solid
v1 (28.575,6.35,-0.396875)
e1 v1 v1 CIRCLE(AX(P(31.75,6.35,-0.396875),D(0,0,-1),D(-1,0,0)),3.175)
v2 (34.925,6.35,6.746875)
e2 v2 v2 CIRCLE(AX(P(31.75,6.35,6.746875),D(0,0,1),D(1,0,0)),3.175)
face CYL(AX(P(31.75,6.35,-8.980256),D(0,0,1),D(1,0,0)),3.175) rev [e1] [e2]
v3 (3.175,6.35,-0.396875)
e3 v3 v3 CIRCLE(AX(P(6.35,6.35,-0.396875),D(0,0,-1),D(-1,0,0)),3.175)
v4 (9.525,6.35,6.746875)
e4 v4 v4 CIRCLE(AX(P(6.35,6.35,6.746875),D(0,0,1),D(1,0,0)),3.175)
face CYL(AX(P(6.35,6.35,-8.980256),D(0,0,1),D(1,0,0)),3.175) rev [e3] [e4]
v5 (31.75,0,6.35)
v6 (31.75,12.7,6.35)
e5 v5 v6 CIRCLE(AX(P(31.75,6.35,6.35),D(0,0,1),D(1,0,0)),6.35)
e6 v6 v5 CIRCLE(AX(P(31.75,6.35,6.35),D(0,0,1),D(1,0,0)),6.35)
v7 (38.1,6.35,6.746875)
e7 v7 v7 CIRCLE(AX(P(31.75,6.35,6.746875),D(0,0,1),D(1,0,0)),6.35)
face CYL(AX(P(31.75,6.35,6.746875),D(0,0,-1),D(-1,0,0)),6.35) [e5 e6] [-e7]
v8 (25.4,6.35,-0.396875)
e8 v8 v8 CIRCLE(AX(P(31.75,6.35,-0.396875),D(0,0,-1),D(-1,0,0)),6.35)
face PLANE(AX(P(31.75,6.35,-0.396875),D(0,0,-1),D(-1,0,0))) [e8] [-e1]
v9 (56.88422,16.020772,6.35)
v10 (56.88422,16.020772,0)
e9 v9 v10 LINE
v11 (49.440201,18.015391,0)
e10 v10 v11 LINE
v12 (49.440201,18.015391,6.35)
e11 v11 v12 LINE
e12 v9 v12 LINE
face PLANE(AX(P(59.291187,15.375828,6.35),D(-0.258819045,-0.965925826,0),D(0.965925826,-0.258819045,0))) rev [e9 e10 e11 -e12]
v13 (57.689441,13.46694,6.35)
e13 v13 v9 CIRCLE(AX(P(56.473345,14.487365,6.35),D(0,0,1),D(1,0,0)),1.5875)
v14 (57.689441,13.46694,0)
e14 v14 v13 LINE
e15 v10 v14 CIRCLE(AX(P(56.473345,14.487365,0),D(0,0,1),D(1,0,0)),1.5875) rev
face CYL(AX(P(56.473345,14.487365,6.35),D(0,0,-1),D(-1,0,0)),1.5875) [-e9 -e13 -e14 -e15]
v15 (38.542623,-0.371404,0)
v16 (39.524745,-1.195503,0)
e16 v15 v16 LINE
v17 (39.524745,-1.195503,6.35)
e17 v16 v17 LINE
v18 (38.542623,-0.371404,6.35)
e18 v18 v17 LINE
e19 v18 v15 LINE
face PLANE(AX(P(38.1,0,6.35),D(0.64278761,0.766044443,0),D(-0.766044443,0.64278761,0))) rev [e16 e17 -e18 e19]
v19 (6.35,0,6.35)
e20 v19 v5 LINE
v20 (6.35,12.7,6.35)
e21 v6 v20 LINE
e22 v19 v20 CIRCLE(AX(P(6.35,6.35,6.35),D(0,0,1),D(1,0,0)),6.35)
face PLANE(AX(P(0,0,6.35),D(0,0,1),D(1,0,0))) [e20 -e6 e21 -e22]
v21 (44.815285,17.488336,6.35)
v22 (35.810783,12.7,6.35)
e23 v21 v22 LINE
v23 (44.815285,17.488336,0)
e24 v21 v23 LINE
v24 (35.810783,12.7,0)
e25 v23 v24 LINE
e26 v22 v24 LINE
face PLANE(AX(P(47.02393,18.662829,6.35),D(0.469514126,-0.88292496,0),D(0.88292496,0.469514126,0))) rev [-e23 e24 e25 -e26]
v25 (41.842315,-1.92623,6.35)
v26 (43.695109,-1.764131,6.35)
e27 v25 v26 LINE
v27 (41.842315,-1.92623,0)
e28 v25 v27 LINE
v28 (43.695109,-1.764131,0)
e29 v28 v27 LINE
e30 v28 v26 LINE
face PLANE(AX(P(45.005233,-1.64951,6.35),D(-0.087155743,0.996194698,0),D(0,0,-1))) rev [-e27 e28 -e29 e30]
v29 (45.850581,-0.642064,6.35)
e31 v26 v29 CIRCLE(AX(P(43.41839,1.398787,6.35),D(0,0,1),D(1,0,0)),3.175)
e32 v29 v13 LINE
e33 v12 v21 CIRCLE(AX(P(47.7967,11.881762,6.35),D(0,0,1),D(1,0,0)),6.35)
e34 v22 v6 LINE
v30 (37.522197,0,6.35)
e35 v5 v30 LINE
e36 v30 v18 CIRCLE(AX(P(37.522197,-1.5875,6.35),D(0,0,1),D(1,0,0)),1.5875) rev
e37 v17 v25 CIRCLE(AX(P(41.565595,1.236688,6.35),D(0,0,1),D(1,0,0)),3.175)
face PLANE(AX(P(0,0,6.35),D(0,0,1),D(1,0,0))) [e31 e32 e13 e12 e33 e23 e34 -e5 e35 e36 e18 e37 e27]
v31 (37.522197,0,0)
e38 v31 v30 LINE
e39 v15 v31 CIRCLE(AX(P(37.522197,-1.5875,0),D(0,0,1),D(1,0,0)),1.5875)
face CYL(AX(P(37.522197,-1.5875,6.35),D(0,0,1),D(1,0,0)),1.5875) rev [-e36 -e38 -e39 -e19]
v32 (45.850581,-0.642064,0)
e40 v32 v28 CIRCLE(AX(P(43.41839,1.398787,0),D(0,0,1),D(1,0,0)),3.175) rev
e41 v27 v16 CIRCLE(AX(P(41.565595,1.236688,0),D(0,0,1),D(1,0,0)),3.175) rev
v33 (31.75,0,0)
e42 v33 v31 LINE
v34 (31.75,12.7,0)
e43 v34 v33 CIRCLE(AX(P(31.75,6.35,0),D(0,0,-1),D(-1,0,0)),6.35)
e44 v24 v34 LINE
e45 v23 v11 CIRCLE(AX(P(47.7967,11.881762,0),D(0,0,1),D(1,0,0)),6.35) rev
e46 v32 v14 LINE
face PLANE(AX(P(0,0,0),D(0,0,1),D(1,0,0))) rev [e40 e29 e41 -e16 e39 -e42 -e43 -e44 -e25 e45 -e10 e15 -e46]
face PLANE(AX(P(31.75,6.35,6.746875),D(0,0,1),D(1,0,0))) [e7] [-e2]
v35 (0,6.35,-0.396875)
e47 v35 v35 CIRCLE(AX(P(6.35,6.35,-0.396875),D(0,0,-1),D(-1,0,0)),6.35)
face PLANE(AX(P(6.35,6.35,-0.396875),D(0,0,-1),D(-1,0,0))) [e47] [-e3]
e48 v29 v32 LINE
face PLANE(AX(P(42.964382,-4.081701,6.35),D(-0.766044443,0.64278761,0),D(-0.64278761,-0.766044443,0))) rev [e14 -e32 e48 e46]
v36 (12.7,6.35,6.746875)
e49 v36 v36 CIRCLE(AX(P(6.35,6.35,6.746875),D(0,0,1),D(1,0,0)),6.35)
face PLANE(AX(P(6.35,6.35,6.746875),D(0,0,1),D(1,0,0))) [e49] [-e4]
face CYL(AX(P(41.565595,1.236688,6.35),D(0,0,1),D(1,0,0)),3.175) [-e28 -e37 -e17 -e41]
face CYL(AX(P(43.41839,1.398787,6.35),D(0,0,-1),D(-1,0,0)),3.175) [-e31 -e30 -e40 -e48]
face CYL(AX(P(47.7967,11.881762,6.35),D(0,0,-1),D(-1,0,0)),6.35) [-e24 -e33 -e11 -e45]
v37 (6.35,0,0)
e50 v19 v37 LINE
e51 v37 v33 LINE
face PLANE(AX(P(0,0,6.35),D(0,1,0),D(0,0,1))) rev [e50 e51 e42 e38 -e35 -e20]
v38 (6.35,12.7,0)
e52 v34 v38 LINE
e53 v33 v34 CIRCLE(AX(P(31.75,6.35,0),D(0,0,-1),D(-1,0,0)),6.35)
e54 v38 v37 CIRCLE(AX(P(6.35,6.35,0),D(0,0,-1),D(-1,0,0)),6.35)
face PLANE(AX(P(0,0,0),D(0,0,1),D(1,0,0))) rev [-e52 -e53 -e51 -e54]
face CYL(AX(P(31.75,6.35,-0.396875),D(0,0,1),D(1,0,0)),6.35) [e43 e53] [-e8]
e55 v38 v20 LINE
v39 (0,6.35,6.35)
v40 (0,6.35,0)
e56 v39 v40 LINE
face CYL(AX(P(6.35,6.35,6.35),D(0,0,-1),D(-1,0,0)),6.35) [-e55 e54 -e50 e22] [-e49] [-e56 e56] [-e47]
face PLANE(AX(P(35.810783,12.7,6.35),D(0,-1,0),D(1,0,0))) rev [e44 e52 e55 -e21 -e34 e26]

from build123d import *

# Parameters (mm, degrees)
BOSS_EXTRUDE1_DEPTH = 6.35
FILLET1_R           = 6.35
SKETCH2_R           = 3.175
CUT_EXTRUDE1_DEPTH  = 6.35
BOSS_EXTRUDE2_START = 0.396875
SKETCH3_R           = 6.35
SKETCH3_R_2         = 3.175
BOSS_EXTRUDE2_DEPTH = 0.396875
SKETCH4_R           = 6.35
SKETCH4_R_2         = 3.175
BOSS_EXTRUDE3_DEPTH = 0.396875
FILLET2_R           = 1.5875
CHAMFER1_SIZE       = 3.175
FILLET3_R           = 3.175


with BuildPart() as part:
    # Sketch1 → Boss-Extrude1 (new body)
    with BuildSketch(Plane.XY):
        Polygon((0, 0), (38.1, 0), (42.964382214, -4.081701322), (59.2911875, 15.375827534), (47.023929506, 18.662829407), (35.810782514, 12.7), (0, 12.7), align=None)
    extrude(amount=BOSS_EXTRUDE1_DEPTH)

    # Fillet1
    fillet1_edges = [part.edges().sort_by_distance(p)[0] for p in [
        (47.023929506, 18.662829407, 3.175),
        (0, 0, 3.175),
        (0, 12.7, 3.175),
    ]]
    fillet(fillet1_edges, radius=FILLET1_R - 0.0001)  # a hair under: the kernel refuses the full size

    # Sketch2 → Cut-Extrude1 (cut)
    with BuildSketch(Plane.XY.offset(6.35)):
        with Locations((6.35, 6.35)):
            Circle(SKETCH2_R)
        with Locations((31.75, 6.35)):
            Circle(SKETCH2_R)
    extrude(amount=-CUT_EXTRUDE1_DEPTH, mode=Mode.SUBTRACT)

    # Sketch3 → Boss-Extrude2 (add)
    # profile 1 of 2: a face of its own
    with BuildSketch(Plane.XY.offset(6.35).offset(BOSS_EXTRUDE2_START)):
        with Locations(Location((31.75, 6.35, 0), (0, 0, 270))):
            Circle(SKETCH3_R)
        with Locations((31.75, 6.35)):
            Circle(SKETCH3_R_2, mode=Mode.SUBTRACT)
    # profile 2 of 2: a face of its own
    with BuildSketch(Plane.XY.offset(6.35).offset(BOSS_EXTRUDE2_START)):
        with Locations(Location((6.35, 6.35, 0), (0, 0, 180))):
            Circle(SKETCH3_R)
        with Locations((6.35, 6.35)):
            Circle(SKETCH3_R_2, mode=Mode.SUBTRACT)
    extrude(amount=-BOSS_EXTRUDE2_DEPTH)

    # Sketch4 → Boss-Extrude3 (add)
    # profile 1 of 2: a face of its own
    with BuildSketch(Plane(origin=(0, 0, 0), x_dir=(-1, 0, 0), z_dir=(0, 0, -1))):
        with Locations(Location((-31.75, 6.35, 0), (0, 0, 270))):
            Circle(SKETCH4_R)
        with Locations(Location((-31.75, 6.35, 0), (0, 0, 180))):
            Circle(SKETCH4_R_2, mode=Mode.SUBTRACT)
    # profile 2 of 2: a face of its own
    with BuildSketch(Plane(origin=(0, 0, 0), x_dir=(-1, 0, 0), z_dir=(0, 0, -1))):
        with Locations((-6.35, 6.35)):
            Circle(SKETCH4_R)
        with Locations(Location((-6.35, 6.35, 0), (0, 0, 180))):
            Circle(SKETCH4_R_2, mode=Mode.SUBTRACT)
    extrude(amount=BOSS_EXTRUDE3_DEPTH)

    # Fillet2
    fillet2_edges = [part.edges().sort_by_distance(p)[0] for p in [
        (59.2911875, 15.375827534, 3.175),
        (38.1, 0, 3.175),
    ]]
    fillet(fillet2_edges, radius=FILLET2_R)

    # Chamfer1
    chamfer1_edges = [part.edges().sort_by_distance(p)[0] for p in [
        (42.964382214, -4.081701322, 3.175),
    ]]
    chamfer(chamfer1_edges, length=CHAMFER1_SIZE)

    # Fillet3
    fillet3_edges = [part.edges().sort_by_distance(p)[0] for p in [
        (45.005232875, -1.649510215, 3.175),
        (40.532191107, -2.040850661, 3.175),
    ]]
    fillet(fillet3_edges, radius=FILLET3_R)


solid = part.part
